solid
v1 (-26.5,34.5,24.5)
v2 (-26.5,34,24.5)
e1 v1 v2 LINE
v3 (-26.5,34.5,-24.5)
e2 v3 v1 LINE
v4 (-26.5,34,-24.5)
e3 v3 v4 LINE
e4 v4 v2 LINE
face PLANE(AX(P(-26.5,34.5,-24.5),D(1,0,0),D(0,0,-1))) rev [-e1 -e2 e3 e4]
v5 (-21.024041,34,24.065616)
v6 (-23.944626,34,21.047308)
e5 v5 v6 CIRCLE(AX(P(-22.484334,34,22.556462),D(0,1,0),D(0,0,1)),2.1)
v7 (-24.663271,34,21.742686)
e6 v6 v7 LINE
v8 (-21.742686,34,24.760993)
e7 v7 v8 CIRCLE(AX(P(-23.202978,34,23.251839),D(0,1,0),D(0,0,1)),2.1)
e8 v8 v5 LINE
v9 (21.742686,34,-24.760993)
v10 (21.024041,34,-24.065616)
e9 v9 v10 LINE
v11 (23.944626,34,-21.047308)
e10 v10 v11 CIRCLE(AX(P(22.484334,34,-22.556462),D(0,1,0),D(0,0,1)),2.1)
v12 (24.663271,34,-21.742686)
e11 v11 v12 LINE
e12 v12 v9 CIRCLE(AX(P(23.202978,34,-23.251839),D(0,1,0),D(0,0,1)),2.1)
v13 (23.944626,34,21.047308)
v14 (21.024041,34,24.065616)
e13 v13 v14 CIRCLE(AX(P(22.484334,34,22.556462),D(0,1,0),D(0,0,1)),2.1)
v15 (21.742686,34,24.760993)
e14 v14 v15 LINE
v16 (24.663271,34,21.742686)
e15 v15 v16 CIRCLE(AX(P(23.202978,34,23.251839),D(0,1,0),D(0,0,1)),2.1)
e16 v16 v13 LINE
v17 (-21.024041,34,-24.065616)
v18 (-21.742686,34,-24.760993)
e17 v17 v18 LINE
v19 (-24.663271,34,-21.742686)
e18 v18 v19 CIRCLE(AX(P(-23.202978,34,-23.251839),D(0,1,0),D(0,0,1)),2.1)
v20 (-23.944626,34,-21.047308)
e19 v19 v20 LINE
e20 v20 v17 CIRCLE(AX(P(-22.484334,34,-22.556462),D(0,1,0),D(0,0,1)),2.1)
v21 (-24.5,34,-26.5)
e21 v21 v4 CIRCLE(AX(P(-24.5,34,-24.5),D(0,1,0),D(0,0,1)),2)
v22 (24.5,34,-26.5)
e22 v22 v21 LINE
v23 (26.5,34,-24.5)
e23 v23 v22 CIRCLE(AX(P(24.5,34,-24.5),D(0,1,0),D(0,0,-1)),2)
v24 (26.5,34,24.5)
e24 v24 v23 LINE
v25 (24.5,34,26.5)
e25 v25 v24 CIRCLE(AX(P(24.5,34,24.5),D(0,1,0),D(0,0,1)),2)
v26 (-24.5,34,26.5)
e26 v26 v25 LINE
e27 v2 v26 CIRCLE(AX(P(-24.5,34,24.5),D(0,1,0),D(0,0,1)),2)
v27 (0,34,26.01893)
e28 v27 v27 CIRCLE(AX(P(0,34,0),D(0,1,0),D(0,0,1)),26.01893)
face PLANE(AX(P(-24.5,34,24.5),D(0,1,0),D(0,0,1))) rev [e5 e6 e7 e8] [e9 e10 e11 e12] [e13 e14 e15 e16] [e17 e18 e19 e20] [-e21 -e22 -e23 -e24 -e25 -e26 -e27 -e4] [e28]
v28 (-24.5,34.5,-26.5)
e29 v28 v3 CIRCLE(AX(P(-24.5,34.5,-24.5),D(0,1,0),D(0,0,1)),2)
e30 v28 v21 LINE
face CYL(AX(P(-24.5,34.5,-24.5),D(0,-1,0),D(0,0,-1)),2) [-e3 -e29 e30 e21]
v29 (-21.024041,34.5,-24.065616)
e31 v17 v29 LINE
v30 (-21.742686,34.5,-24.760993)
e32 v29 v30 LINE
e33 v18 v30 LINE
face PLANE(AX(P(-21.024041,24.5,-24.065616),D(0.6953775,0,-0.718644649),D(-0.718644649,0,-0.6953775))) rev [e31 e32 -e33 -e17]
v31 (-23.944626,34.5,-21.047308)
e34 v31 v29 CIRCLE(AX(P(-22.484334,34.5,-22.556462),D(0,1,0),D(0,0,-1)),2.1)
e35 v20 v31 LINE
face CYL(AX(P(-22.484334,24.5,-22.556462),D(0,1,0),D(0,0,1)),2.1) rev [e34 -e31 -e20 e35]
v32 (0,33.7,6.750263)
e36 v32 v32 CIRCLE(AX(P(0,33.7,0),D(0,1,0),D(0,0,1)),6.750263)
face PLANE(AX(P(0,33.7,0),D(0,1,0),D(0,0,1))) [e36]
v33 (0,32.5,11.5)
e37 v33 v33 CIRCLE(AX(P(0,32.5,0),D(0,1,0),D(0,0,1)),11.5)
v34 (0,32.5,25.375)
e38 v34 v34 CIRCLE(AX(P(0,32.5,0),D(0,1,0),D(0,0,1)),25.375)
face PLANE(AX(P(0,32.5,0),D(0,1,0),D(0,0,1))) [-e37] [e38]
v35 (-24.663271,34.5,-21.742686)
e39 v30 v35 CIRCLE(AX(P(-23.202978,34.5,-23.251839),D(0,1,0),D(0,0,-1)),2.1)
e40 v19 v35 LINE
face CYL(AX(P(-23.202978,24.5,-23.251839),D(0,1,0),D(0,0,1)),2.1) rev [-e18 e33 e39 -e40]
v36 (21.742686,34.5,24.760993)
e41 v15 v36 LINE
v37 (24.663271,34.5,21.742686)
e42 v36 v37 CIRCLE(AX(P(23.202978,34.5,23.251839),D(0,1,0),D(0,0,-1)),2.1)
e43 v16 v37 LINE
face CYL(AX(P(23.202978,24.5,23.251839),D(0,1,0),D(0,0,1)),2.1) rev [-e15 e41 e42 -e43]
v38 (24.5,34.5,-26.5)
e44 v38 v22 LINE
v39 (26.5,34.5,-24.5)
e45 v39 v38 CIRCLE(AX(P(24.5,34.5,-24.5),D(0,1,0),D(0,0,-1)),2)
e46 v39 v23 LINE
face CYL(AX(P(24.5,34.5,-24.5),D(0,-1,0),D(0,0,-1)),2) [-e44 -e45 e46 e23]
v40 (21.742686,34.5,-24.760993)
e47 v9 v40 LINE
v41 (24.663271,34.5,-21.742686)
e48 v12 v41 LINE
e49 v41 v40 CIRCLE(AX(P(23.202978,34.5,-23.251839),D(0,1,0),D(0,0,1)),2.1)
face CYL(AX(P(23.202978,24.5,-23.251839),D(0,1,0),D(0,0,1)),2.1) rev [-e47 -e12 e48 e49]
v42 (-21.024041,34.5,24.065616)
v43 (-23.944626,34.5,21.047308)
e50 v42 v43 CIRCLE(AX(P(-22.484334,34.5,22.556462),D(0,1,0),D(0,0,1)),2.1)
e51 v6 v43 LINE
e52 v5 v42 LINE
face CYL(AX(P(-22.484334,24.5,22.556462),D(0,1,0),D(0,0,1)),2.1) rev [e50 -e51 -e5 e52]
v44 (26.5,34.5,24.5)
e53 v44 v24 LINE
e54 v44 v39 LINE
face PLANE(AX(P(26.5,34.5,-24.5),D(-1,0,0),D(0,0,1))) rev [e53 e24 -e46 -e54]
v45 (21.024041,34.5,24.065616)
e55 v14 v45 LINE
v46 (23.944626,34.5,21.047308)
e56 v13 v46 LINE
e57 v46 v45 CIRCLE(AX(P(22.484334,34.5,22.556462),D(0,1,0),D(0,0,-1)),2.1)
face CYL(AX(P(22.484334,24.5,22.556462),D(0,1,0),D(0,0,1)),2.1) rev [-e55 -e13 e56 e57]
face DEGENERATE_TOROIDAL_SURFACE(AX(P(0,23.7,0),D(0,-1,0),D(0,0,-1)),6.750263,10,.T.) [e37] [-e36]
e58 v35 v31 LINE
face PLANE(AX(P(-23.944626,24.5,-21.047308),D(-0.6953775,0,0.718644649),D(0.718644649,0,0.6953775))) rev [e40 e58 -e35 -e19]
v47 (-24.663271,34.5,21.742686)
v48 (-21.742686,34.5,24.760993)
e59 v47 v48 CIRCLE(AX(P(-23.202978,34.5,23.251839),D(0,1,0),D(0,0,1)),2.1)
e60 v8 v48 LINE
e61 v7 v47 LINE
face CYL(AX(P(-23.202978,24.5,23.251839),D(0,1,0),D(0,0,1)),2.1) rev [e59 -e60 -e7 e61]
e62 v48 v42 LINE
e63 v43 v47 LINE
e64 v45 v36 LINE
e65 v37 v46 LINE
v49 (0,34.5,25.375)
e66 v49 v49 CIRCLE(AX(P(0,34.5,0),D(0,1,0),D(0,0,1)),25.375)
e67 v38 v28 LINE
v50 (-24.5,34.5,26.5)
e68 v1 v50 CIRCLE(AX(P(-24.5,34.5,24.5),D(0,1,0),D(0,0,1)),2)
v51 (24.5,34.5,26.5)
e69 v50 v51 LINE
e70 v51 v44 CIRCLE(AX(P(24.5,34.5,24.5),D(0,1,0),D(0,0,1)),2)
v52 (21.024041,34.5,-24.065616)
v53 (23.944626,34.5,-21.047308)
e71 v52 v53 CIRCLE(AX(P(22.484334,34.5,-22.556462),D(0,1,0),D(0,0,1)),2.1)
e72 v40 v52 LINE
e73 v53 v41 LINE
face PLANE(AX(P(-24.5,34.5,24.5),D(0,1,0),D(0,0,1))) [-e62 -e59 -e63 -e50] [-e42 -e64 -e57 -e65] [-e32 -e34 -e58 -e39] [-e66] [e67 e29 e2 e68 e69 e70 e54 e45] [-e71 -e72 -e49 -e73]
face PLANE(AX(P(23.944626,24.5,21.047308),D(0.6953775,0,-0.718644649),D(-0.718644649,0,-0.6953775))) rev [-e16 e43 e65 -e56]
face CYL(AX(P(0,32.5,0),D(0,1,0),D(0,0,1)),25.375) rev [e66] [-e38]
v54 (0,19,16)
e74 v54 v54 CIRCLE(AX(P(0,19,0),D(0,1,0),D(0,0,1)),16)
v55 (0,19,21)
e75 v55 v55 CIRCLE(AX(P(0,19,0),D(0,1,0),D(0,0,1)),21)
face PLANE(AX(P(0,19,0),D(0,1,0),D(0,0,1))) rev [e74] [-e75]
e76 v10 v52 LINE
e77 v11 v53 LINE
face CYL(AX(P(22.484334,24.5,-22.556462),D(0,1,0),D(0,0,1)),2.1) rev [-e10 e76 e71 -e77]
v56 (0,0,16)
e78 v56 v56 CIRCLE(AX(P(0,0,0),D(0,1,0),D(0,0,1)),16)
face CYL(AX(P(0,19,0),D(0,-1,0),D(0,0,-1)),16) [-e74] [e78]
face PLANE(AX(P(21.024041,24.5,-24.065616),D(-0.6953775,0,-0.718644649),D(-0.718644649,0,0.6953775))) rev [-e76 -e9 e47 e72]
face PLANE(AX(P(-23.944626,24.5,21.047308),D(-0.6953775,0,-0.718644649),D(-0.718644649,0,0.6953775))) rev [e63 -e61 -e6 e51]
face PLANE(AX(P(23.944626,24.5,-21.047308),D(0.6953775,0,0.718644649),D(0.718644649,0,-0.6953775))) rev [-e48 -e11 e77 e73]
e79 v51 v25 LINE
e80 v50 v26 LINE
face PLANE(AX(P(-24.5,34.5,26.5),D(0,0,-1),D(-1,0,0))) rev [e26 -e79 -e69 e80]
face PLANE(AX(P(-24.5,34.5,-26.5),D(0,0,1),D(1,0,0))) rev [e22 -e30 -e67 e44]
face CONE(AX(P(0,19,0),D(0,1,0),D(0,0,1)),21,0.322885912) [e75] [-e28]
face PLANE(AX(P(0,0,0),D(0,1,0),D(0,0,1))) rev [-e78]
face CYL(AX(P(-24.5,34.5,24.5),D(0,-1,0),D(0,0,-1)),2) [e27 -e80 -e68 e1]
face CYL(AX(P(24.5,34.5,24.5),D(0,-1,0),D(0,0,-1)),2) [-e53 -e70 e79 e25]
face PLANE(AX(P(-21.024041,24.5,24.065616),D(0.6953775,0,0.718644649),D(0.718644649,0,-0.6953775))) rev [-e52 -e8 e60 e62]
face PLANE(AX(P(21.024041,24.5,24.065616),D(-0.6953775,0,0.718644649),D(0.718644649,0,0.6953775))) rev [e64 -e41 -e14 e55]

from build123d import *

# Parameters (mm, degrees)
ESQUISSE2_R             = 16
BOSS_EXTRU_1_DEPTH      = 19
ESQUISSE3_R             = 21
BOSS_EXTRU_2_DEPTH      = 15
D_POUILLE1_ANGLE        = 18.5
BOSS_EXTRU_3_DEPTH      = 0.5
ESQUISSE5_R             = 25.375
ENL_V_MAT_EXTRU_1_DEPTH = 2
ESQUISSE6_R             = 11.5
BOSS_EXTRU_4_DEPTH      = 1.2
CONG_1_R                = 10
ENL_V_MAT_EXTRU_2_DEPTH = 10


with BuildPart() as part:
    # Esquisse2 → Boss.-Extru.1 (new body)
    with BuildSketch(Plane(origin=(0, 0, 0), x_dir=(1, 0, 0), z_dir=(0, 1, 0))):
        with Locations(Location((0, 0, 0), (0, 0, 270))):
            Circle(ESQUISSE2_R)
    extrude(amount=BOSS_EXTRU_1_DEPTH)

    # Esquisse3 → Boss.-Extru.2 (add)
    with BuildSketch(Plane(origin=(0, 19, 0), x_dir=(1, 0, 0), z_dir=(0, 1, 0))):
        with Locations(Location((0, 0, 0), (0, 0, 270))):
            Circle(ESQUISSE3_R)
    extrude(amount=BOSS_EXTRU_2_DEPTH)

    # Dépouille1
    d_pouille1_faces = [part.faces().sort_by_distance(p)[0] for p in [
        (0, 26.5, -21),
    ]]
    draft(d_pouille1_faces, Plane(origin=(0, 19, 0), x_dir=(0, 0, -1), z_dir=(0, -1, 0)), D_POUILLE1_ANGLE)

    # Esquisse4 → Boss.-Extru.3 (add)
    with BuildSketch(Plane(origin=(0, 34, 0), x_dir=(1, 0, 0), z_dir=(0, 1, 0))):
        with BuildLine():
            Line((-24.5, 26.5), (24.5, 26.5))
            ThreePointArc((24.5, 26.5), (25.914213562, 25.914213562), (26.5, 24.5))
            Line((26.5, 24.5), (26.5, -24.5))
            ThreePointArc((26.5, -24.5), (25.914213562, -25.914213562), (24.5, -26.5))
            Line((24.5, -26.5), (-24.5, -26.5))
            ThreePointArc((-24.5, -26.5), (-25.914213562, -25.914213562), (-26.5, -24.5))
            Line((-26.5, -24.5), (-26.5, 24.5))
            ThreePointArc((-26.5, 24.5), (-25.914213562, 25.914213562), (-24.5, 26.5))
        make_face()
    extrude(amount=BOSS_EXTRU_3_DEPTH)

    # Esquisse5 → Enlèv. mat.-Extru.1 (cut)
    with BuildSketch(Plane(origin=(0, 34.5, 0), x_dir=(1, 0, 0), z_dir=(0, 1, 0))):
        with Locations(Location((0, 0, 0), (0, 0, 270))):
            Circle(ESQUISSE5_R)
    extrude(amount=-ENL_V_MAT_EXTRU_1_DEPTH, mode=Mode.SUBTRACT)

    # Esquisse6 → Boss.-Extru.4 (add)
    with BuildSketch(Plane(origin=(0, 32.5, 0), x_dir=(1, 0, 0), z_dir=(0, 1, 0))):
        with Locations(Location((0, 0, 0), (0, 0, 270))):
            Circle(ESQUISSE6_R)
    extrude(amount=BOSS_EXTRU_4_DEPTH)

    # Congé1
    # the kernel refuses this fillet: 10 mm, written as the material it takes off along each edge
    with BuildSketch(Plane(origin=(0, 33.7, 0), x_dir=(0, 0, 1), z_dir=(-1, 0, 0))) as cong_1_piece_1:
        with BuildLine():
            CenterArc((6.750263165, -10), CONG_1_R, 61.642363424, 28.357636576)
            Line((6.750263165, 0), (6.750263165, 0.2))
            Line((6.750263165, 0.2), (11.5, 0.2))
            Line((11.5, 0.2), (11.7, 0))
            ThreePointArc((11.7, 0), (11.7, -0.6), (11.594994737, -1.024))
            Line((11.594994737, -1.024), (11.5, -1.2))
        make_face()
    revolve(axis=Axis((0, 33.7, 0), (0, 1, 0)), mode=Mode.SUBTRACT)

    # Esquisse7 → Enlèv. mat.-Extru.2 (cut)
    with BuildSketch(Plane(origin=(0, 34.5, 0), x_dir=(1, 0, 0), z_dir=(0, 1, 0))):
        with BuildLine():
            Line((21.024040871, 24.065615546), (21.74268552, 24.760993047))
            ThreePointArc((21.74268552, 24.760993047), (24.712132034, 24.712132034), (24.663271022, 21.74268552))
            Line((24.663271022, 21.74268552), (23.944626373, 21.04730802))
            ThreePointArc((23.944626373, 21.04730802), (20.975179858, 21.096169032), (21.024040871, 24.065615546))
        make_face()
        with BuildLine():
            Line((-21.024040871, 24.065615546), (-21.74268552, 24.760993047))
            ThreePointArc((-21.74268552, 24.760993047), (-24.712132034, 24.712132034), (-24.663271022, 21.74268552))
            Line((-24.663271022, 21.74268552), (-23.944626373, 21.04730802))
            ThreePointArc((-23.944626373, 21.04730802), (-20.975179858, 21.096169032), (-21.024040871, 24.065615546))
        make_face()
        with BuildLine():
            Line((21.024040871, -24.065615546), (21.74268552, -24.760993047))
            ThreePointArc((21.74268552, -24.760993047), (24.712132034, -24.712132034), (24.663271022, -21.74268552))
            Line((24.663271022, -21.74268552), (23.944626373, -21.04730802))
            ThreePointArc((23.944626373, -21.04730802), (20.975179858, -21.096169032), (21.024040871, -24.065615546))
        make_face()
        with BuildLine():
            Line((-21.024040871, -24.065615546), (-21.74268552, -24.760993047))
            ThreePointArc((-21.74268552, -24.760993047), (-24.712132034, -24.712132034), (-24.663271022, -21.74268552))
            Line((-24.663271022, -21.74268552), (-23.944626373, -21.04730802))
            ThreePointArc((-23.944626373, -21.04730802), (-20.975179858, -21.096169032), (-21.024040871, -24.065615546))
        make_face()
    extrude(amount=-ENL_V_MAT_EXTRU_2_DEPTH, mode=Mode.SUBTRACT)


solid = part.part
